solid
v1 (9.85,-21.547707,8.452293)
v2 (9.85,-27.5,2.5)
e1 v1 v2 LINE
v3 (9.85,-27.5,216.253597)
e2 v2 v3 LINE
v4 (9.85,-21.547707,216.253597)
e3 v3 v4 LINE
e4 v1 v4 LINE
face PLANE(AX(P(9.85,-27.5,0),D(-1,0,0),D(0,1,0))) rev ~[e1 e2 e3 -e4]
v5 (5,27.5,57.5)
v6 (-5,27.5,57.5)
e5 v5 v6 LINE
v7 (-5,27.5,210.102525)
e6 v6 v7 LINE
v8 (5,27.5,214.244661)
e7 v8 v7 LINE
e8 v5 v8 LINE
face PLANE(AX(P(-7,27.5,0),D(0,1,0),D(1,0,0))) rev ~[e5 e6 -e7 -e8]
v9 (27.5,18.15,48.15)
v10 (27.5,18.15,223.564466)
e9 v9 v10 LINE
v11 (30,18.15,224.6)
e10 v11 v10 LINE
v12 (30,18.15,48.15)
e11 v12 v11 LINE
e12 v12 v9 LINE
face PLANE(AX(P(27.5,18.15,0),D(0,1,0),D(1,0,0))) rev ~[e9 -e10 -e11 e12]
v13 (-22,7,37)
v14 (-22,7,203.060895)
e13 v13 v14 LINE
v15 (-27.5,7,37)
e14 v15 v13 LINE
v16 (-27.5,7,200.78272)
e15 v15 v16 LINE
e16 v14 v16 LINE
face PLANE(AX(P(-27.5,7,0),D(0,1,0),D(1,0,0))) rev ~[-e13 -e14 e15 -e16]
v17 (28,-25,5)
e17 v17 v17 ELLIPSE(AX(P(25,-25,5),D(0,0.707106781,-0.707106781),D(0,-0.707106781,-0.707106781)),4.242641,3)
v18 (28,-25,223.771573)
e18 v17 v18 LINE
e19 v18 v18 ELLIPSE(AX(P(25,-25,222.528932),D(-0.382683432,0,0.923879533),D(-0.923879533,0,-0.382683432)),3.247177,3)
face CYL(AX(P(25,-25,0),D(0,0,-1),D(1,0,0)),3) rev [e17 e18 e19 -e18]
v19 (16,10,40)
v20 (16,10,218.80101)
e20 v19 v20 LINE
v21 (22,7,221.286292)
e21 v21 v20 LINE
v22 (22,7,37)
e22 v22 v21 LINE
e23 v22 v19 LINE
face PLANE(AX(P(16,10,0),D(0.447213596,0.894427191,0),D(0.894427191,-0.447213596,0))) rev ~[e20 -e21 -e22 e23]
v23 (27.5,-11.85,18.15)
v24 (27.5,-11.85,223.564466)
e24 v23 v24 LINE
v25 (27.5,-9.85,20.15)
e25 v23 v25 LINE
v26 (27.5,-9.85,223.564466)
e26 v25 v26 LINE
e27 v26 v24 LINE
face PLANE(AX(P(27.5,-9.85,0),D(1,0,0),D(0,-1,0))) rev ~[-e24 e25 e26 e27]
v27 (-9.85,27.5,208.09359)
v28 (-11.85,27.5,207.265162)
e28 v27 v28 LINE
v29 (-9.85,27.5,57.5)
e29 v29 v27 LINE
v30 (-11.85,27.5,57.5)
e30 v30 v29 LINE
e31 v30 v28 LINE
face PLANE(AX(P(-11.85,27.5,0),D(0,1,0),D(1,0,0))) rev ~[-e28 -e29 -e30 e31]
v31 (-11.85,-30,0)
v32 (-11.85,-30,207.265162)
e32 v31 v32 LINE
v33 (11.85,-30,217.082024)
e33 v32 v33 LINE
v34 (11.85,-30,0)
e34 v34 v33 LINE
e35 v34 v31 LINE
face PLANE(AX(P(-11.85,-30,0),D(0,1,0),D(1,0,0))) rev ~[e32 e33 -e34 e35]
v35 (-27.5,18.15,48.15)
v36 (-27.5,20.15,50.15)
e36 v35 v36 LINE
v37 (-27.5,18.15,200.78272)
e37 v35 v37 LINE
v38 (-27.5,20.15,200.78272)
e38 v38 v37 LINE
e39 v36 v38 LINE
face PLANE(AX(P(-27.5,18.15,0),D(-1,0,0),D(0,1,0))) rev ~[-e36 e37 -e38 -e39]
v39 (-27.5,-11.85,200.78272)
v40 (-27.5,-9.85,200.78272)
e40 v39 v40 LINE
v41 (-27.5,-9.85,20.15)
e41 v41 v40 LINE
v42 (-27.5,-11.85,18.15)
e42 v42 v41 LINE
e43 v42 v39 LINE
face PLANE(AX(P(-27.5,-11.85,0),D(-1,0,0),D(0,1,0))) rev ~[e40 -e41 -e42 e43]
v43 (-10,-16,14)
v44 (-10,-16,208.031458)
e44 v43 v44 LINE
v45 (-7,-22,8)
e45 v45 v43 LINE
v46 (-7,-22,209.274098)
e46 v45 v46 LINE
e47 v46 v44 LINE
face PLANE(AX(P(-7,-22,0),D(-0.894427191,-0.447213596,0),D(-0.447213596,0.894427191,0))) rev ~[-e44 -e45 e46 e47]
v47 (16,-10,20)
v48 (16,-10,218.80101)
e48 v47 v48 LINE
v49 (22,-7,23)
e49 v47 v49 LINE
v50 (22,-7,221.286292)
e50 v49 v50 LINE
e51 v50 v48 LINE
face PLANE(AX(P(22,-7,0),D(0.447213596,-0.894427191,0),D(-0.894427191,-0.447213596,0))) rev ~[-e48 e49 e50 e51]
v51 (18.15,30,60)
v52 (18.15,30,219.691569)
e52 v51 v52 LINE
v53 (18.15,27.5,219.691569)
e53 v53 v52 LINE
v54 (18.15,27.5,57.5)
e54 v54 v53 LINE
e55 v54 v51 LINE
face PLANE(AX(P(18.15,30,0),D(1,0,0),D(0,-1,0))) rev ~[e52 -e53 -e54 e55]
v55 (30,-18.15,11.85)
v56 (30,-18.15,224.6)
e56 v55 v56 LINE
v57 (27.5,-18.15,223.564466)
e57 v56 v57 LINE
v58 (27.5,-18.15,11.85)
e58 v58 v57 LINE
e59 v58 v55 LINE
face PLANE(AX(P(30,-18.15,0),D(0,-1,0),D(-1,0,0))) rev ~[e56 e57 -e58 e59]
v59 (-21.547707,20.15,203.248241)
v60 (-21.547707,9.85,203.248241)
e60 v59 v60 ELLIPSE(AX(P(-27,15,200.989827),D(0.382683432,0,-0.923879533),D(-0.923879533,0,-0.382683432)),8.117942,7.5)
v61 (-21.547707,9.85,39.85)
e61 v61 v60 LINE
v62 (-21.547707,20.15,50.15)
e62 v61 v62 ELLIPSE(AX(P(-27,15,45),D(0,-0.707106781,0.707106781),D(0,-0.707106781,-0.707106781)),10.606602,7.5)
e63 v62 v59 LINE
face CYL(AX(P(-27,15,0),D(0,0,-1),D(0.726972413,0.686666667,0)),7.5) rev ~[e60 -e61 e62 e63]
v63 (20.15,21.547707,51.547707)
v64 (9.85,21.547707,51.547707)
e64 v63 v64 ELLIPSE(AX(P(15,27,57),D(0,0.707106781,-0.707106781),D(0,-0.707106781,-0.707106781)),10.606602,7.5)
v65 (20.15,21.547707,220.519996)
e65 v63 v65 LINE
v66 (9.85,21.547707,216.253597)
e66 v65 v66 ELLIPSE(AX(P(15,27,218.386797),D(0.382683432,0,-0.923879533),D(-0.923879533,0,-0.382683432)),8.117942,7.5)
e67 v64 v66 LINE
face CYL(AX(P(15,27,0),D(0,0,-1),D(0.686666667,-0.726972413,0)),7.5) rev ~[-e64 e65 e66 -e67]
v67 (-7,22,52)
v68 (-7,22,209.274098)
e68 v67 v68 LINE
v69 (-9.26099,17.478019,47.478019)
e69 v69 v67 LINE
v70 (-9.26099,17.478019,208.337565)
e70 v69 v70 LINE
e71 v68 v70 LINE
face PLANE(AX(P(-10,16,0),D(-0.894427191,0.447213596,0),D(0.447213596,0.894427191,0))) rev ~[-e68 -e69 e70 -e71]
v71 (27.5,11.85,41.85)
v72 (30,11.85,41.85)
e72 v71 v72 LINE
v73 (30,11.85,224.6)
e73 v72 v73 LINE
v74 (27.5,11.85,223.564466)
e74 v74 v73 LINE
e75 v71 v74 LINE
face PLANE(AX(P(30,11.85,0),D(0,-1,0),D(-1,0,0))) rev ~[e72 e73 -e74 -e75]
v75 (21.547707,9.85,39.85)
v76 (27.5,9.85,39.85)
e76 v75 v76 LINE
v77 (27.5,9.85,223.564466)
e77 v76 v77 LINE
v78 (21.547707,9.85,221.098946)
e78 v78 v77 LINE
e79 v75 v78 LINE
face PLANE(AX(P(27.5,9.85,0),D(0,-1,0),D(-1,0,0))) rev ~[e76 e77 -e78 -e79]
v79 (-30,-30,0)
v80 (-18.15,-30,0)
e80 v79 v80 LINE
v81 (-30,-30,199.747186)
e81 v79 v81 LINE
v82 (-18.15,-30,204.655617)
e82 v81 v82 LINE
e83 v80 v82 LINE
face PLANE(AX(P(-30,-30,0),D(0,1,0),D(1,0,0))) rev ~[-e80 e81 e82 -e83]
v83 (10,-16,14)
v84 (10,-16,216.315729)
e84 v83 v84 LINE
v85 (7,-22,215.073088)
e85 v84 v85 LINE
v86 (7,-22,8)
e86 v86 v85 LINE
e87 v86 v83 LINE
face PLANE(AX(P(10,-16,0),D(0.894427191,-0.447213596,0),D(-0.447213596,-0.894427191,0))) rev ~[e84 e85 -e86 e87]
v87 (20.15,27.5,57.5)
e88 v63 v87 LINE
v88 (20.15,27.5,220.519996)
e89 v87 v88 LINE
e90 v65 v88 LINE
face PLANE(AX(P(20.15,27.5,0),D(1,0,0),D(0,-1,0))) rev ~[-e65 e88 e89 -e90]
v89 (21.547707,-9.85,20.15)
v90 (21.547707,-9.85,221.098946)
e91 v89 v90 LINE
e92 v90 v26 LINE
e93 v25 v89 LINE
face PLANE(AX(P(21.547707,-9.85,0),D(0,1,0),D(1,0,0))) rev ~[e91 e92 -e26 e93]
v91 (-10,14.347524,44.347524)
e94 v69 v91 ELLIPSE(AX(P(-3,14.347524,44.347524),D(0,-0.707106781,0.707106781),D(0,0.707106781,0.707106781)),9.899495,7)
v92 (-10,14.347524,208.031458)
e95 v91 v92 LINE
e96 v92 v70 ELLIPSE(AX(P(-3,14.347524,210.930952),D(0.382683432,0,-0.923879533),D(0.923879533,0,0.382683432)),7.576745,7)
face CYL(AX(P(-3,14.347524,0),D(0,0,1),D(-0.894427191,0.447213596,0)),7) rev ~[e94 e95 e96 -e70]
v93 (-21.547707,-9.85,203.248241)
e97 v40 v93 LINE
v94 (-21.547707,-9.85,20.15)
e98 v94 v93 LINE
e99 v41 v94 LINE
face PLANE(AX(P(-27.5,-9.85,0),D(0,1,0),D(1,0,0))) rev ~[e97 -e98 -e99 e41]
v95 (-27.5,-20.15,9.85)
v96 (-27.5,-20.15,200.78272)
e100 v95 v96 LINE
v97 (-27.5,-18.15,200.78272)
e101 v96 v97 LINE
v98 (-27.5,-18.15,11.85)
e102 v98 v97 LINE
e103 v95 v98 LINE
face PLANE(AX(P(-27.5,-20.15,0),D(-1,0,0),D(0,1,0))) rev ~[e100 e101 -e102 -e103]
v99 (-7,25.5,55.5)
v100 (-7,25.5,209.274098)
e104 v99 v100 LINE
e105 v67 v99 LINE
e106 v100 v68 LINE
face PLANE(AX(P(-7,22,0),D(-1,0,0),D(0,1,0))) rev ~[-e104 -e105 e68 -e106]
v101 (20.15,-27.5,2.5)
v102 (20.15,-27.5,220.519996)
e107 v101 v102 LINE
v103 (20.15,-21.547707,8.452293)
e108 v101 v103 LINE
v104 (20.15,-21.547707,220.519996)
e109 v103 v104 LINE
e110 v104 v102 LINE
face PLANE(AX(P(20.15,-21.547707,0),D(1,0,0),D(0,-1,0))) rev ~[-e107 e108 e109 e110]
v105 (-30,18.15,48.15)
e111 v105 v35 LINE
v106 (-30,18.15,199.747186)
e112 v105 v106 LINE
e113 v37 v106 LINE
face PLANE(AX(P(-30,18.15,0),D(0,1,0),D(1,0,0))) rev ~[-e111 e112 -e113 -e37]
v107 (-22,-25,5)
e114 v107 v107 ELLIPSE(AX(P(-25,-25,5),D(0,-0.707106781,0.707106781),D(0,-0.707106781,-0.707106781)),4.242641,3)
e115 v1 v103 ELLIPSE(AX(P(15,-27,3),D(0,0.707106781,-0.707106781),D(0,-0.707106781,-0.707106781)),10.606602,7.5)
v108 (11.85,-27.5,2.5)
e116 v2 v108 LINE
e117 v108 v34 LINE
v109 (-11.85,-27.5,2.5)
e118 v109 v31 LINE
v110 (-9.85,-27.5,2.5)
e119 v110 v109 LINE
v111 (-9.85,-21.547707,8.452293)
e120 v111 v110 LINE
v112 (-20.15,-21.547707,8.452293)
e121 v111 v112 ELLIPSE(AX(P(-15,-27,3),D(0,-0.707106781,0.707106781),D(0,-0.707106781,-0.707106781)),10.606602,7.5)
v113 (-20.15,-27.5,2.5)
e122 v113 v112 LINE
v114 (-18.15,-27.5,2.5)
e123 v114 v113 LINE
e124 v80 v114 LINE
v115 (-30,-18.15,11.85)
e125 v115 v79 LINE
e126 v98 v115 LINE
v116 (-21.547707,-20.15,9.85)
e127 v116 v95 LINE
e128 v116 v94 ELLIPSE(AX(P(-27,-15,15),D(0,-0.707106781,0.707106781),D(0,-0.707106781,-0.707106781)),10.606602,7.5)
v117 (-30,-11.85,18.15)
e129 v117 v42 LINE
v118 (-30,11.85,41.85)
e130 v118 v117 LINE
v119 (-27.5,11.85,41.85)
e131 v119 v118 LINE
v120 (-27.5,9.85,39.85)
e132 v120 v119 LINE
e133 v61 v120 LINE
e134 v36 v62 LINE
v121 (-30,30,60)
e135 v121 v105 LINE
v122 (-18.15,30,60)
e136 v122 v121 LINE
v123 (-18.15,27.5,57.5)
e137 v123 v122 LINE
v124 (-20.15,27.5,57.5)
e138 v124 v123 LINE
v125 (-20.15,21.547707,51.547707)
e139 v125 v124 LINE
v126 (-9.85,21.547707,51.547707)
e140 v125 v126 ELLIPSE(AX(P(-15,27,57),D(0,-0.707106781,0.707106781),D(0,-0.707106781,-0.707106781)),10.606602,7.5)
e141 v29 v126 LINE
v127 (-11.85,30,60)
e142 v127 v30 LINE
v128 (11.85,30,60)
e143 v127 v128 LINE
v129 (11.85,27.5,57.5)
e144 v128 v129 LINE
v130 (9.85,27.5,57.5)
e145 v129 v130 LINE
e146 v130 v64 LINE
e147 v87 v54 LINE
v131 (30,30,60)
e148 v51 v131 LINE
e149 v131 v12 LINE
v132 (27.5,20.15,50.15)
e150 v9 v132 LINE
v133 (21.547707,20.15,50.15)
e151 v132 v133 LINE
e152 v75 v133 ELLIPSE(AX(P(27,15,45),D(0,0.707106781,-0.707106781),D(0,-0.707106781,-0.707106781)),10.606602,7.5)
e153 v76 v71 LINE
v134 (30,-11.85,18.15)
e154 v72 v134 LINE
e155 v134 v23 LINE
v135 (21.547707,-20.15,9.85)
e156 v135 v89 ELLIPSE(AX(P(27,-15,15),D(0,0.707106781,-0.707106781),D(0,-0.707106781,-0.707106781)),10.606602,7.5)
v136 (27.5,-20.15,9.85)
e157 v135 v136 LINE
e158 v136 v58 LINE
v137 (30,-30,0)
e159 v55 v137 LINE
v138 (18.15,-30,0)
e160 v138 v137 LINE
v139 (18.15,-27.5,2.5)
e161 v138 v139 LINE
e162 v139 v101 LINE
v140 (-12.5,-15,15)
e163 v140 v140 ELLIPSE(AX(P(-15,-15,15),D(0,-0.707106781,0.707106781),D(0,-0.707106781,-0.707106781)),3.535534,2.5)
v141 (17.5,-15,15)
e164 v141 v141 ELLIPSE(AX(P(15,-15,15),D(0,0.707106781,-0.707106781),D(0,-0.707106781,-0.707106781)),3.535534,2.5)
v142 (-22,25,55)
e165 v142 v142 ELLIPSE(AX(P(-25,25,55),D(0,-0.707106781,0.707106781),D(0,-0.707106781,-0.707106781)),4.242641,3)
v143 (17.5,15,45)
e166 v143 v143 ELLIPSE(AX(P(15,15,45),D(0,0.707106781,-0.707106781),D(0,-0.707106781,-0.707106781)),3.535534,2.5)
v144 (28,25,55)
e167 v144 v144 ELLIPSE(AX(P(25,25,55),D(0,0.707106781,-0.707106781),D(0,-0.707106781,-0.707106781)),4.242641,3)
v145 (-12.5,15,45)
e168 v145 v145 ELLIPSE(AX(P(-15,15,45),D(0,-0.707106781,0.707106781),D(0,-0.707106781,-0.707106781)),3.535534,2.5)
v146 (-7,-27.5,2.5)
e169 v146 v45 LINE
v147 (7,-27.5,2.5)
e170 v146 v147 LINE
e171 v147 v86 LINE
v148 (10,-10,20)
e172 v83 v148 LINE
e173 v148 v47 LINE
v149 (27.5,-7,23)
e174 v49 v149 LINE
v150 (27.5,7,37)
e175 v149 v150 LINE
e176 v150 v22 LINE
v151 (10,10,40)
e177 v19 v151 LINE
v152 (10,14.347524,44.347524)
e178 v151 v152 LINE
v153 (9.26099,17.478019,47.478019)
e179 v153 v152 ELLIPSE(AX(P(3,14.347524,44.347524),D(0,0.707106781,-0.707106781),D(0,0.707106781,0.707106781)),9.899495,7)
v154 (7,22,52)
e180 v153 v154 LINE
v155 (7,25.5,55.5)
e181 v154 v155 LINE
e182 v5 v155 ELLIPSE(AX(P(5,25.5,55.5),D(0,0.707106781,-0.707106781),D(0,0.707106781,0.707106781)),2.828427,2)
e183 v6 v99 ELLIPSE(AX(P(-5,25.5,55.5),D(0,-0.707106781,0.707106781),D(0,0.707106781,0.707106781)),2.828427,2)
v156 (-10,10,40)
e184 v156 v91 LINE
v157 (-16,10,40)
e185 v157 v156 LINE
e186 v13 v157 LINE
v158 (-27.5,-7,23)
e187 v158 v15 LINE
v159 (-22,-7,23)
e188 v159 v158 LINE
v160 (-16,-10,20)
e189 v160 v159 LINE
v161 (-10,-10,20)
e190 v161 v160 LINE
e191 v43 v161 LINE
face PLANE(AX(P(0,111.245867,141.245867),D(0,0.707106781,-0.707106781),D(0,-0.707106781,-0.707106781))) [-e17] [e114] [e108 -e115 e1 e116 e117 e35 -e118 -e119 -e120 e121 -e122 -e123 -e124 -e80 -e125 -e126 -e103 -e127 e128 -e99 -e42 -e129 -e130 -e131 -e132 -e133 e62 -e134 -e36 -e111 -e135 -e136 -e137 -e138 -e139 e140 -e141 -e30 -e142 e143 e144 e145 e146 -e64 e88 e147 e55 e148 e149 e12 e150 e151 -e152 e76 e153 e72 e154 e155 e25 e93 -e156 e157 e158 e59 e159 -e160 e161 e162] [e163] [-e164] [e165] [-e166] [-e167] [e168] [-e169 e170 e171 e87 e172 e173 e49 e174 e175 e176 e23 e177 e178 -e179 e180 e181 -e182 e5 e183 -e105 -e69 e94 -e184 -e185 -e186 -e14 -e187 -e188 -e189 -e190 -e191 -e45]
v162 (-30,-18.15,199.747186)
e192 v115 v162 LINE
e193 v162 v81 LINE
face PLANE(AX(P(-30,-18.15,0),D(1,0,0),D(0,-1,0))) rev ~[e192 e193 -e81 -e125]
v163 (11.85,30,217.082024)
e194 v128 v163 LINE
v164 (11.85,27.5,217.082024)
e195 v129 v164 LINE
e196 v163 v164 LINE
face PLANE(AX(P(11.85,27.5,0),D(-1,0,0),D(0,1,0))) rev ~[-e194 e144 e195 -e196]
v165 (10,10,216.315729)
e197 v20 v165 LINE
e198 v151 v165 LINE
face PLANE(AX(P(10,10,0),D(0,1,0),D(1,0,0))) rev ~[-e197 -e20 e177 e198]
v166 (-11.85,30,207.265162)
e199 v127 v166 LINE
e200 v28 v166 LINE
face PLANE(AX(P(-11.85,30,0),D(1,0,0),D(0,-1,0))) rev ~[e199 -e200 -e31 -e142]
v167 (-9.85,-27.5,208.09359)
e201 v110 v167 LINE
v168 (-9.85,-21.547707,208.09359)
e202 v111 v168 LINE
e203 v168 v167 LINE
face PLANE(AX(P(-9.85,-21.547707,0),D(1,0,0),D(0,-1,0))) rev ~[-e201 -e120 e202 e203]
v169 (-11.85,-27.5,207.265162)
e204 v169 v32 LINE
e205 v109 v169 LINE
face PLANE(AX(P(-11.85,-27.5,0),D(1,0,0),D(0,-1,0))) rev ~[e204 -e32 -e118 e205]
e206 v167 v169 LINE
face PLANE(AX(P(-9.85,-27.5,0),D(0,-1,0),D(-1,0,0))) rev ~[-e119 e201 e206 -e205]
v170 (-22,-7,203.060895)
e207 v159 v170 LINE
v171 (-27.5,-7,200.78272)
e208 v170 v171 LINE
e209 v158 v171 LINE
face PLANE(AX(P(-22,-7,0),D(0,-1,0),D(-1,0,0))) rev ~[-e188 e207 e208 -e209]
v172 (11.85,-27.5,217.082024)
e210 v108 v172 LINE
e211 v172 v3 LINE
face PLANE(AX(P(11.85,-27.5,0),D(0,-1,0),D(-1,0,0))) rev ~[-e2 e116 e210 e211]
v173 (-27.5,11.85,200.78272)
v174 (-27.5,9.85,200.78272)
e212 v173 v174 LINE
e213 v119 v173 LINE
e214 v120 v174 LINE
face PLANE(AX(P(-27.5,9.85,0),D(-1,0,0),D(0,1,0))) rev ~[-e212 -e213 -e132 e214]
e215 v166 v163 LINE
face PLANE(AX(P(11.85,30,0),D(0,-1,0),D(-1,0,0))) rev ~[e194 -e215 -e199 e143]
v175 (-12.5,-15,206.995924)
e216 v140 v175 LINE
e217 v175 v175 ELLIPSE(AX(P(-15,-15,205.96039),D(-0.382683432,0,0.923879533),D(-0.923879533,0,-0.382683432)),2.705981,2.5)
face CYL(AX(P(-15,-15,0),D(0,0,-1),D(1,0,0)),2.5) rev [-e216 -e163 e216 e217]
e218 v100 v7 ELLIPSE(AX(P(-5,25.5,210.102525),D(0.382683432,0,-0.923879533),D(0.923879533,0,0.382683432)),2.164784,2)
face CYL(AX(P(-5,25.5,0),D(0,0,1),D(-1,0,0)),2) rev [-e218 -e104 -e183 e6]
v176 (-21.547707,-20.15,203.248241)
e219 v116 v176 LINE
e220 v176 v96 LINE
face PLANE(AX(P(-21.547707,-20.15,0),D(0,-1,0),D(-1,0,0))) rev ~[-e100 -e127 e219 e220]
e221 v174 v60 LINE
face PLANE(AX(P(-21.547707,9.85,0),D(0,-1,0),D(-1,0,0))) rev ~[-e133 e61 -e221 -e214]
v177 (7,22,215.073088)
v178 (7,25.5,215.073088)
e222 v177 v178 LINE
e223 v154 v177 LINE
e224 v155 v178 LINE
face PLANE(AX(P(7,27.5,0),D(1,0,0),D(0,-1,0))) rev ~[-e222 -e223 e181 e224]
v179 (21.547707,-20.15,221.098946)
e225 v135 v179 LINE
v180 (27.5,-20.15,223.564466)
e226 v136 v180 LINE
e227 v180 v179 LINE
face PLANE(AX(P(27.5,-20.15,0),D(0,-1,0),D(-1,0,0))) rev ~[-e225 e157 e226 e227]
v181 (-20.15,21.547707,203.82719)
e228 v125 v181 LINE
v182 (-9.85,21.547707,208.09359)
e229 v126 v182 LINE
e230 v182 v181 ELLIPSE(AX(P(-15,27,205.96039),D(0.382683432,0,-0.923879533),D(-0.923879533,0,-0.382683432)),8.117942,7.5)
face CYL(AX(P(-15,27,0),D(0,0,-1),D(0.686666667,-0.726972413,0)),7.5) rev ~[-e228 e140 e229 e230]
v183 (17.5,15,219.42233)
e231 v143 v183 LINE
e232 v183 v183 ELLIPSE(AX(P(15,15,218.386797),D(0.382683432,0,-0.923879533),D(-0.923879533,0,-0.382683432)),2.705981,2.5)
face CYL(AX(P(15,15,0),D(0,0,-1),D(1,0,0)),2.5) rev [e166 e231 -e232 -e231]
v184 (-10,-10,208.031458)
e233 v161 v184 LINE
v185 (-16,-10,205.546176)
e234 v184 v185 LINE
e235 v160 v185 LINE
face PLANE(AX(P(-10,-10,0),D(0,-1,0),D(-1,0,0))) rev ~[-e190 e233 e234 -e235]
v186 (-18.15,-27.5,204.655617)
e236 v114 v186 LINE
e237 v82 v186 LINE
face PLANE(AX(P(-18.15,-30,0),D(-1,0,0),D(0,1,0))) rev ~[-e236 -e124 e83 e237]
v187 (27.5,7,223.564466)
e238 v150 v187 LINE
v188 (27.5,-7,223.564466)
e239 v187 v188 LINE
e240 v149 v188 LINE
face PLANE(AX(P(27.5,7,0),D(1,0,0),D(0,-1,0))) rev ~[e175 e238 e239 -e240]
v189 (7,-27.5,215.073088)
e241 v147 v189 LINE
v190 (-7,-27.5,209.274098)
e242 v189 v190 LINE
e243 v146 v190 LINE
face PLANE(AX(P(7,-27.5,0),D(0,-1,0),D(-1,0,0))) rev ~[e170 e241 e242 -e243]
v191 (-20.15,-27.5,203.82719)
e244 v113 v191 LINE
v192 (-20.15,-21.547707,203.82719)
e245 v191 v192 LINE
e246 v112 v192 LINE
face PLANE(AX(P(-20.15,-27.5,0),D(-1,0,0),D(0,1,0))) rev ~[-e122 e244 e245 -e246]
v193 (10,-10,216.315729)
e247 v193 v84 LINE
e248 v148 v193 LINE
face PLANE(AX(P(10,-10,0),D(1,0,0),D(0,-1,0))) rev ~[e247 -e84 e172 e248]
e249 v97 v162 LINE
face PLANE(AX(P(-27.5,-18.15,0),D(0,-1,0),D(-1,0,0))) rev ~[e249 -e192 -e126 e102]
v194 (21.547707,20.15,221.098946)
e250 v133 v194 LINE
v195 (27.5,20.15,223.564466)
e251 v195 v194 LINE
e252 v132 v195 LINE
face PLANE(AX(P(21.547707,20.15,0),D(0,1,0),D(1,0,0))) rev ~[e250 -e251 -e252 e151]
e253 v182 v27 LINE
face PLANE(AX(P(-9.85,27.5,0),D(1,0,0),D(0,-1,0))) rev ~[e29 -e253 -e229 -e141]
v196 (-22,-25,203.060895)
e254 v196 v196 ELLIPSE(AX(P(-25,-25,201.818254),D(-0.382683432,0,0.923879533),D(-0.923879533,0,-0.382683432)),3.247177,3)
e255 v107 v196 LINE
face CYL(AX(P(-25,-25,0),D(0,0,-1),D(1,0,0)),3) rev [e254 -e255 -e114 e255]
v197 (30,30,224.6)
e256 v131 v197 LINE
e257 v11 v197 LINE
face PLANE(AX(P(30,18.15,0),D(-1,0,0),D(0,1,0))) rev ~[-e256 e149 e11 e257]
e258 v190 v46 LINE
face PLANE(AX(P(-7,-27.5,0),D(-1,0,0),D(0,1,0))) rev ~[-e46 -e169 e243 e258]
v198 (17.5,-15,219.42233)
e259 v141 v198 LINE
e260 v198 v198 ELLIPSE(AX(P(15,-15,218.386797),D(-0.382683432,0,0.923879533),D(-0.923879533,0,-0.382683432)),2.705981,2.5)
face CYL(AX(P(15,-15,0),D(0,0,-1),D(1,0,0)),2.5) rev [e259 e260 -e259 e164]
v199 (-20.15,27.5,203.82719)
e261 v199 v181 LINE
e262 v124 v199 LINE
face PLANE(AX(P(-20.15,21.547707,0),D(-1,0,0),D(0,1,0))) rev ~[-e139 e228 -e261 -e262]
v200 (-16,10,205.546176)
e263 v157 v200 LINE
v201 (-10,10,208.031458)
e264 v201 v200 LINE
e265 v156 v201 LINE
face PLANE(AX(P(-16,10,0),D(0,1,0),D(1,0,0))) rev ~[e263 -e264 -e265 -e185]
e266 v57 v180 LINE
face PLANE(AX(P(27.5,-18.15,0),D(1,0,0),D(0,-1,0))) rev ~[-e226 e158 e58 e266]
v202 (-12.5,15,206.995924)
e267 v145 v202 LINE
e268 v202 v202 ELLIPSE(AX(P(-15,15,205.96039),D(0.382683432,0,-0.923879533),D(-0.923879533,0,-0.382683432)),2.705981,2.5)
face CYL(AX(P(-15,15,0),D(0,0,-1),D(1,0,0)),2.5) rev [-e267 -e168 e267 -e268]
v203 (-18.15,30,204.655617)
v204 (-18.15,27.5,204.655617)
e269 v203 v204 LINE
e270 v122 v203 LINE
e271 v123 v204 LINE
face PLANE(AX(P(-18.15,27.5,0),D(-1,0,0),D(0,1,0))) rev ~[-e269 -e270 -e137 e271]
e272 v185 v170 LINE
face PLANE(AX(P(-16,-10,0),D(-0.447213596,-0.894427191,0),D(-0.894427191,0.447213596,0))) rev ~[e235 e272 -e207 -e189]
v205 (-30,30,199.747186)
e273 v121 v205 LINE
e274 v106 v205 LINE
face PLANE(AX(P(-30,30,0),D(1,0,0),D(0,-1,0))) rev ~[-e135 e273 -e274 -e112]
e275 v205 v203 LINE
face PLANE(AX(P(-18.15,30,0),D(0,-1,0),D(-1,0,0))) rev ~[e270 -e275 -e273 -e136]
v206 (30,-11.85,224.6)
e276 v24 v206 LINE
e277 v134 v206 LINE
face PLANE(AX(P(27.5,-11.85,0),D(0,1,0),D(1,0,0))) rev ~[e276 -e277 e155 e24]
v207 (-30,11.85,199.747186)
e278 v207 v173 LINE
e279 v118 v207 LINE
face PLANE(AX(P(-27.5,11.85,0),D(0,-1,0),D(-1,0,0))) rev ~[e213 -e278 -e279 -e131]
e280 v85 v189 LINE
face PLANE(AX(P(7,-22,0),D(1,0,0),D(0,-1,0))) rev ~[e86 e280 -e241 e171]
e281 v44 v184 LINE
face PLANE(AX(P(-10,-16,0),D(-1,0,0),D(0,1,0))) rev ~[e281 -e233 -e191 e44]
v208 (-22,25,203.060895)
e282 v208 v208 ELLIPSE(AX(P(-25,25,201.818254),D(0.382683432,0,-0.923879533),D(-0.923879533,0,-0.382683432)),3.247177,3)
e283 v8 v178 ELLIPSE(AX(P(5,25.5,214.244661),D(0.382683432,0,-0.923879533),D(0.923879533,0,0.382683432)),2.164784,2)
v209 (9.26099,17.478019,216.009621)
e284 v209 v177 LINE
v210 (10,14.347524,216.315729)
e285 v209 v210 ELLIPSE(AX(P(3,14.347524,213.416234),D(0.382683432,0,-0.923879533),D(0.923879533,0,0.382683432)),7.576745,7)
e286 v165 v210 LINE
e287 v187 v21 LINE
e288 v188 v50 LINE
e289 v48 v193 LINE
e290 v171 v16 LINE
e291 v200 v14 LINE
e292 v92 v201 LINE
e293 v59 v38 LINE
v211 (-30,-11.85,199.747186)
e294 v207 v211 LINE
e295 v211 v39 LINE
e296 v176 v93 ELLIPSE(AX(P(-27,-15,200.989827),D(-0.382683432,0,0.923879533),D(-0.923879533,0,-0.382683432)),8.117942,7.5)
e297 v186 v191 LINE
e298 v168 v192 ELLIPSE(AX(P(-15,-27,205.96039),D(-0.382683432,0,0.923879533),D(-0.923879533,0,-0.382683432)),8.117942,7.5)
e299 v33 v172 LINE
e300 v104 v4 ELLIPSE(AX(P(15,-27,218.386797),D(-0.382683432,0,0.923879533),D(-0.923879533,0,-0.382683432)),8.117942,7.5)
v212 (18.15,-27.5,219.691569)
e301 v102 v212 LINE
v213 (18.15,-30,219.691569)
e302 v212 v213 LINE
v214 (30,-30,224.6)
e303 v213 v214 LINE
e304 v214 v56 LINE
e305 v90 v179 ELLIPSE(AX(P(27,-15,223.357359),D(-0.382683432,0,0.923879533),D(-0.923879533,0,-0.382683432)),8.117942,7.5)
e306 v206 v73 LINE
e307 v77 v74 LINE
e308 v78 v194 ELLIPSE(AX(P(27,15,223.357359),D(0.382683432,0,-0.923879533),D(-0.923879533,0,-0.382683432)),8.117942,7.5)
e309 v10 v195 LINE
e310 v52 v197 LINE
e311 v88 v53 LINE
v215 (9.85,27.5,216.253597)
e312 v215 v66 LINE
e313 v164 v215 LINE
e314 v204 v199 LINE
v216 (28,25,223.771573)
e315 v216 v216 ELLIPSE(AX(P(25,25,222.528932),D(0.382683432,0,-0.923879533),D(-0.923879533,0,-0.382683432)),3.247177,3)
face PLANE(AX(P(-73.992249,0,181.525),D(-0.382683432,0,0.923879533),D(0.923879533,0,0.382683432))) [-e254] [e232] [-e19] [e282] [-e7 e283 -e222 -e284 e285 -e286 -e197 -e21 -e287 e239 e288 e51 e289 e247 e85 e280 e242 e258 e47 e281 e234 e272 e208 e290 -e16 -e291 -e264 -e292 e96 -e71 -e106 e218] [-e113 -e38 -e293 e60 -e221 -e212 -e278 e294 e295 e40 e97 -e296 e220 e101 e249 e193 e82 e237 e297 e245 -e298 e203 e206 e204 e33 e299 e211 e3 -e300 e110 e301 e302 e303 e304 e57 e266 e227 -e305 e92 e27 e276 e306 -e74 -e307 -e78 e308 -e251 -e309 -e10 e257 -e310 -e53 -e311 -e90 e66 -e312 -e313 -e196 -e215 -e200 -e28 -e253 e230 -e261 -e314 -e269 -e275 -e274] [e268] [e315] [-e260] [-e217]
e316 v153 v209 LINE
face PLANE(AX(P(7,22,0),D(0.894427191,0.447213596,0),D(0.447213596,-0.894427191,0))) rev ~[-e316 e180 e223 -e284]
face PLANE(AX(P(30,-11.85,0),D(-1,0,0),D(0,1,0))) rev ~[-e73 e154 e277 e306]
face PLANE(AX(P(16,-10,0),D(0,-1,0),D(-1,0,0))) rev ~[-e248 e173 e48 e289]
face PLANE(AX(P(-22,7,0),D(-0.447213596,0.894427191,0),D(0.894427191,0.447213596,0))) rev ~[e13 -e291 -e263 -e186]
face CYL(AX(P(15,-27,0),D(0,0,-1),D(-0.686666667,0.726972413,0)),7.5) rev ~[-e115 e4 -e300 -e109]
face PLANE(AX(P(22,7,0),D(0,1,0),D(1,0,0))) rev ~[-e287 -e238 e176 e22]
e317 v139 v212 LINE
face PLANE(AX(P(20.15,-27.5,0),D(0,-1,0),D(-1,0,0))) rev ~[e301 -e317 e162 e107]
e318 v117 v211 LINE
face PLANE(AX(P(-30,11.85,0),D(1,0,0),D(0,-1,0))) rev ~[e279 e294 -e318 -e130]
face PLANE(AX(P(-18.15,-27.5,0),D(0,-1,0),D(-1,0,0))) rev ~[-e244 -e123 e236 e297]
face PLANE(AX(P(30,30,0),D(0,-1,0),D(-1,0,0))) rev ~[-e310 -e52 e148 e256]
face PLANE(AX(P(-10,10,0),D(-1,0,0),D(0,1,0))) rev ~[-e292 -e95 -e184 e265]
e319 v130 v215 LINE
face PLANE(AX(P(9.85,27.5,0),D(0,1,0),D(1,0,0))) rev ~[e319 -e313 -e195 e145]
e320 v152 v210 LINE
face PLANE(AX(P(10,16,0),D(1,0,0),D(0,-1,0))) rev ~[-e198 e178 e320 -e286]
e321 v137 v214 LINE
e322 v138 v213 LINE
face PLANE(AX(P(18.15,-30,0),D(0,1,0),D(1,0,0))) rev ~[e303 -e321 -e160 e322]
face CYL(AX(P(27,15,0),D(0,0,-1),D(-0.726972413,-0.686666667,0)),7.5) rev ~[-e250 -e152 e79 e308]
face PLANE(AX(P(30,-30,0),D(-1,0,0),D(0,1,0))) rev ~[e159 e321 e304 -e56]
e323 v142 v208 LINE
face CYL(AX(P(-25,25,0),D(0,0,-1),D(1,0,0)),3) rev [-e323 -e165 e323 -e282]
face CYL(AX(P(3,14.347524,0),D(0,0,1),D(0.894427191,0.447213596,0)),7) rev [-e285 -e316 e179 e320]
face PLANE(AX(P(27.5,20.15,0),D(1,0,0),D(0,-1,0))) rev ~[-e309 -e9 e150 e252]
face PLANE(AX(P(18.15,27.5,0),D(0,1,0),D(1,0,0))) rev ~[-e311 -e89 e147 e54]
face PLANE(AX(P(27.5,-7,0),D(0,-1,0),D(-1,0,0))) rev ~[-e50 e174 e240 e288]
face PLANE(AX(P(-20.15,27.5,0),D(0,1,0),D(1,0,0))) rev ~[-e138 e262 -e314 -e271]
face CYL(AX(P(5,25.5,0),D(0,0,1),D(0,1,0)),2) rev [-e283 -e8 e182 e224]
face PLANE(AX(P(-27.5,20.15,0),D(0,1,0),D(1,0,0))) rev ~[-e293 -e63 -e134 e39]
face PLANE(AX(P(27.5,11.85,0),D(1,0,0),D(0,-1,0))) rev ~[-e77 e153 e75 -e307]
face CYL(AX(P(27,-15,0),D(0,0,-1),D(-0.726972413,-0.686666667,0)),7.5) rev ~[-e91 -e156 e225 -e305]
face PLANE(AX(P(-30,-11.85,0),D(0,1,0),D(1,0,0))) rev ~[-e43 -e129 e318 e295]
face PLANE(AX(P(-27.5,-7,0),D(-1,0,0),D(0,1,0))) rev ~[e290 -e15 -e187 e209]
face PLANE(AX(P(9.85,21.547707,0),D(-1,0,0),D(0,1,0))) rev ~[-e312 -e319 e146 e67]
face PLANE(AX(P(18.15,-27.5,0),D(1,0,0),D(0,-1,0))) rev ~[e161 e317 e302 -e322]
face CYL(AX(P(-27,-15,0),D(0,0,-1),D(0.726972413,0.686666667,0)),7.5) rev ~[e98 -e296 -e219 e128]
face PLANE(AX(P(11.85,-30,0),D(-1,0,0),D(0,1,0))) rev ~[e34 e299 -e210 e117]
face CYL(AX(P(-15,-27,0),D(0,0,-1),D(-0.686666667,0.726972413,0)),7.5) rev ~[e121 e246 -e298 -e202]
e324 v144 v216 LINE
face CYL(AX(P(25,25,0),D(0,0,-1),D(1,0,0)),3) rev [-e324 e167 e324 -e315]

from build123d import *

# Parameters (mm, degrees)
F0_R          = 3
F0_R_2        = 2.5
F1_DEPTH      = 224.6
F2_R          = 2
F3_R          = 7
F6_DEPTH      = 30
F6_DEPTH_BACK = 30
F8_DEPTH      = 30
F8_DEPTH_BACK = 30


# Not quite as in the source:
# - a feature names something its author has since deleted; it is built from what else it names


with BuildPart() as f1:
    # F0 (on Top) → F1 (new body)
    with BuildSketch(Plane.XY):
        with BuildLine():
            Line((18.15, -30), (30, -30))
            Line((30, -30), (30, -18.15))
            Line((30, -18.15), (27.5, -18.15))
            Line((27.5, -18.15), (27.5, -20.15))
            Line((27.5, -20.15), (21.5477069044, -20.15))
            ThreePointArc((21.5477069044, -20.15), (19.5, -15), (21.5477069044, -9.85))
            Line((21.5477069044, -9.85), (27.5, -9.85))
            Line((27.5, -9.85), (27.5, -11.85))
            Line((27.5, -11.85), (30, -11.85))
            Line((30, -11.85), (30, 11.85))
            Line((30, 11.85), (27.5, 11.85))
            Line((27.5, 11.85), (27.5, 9.85))
            Line((27.5, 9.85), (21.5477069044, 9.85))
            ThreePointArc((21.5477069044, 9.85), (19.5, 15), (21.5477069044, 20.15))
            Line((21.5477069044, 20.15), (27.5, 20.15))
            Line((27.5, 20.15), (27.5, 18.15))
            Line((27.5, 18.15), (30, 18.15))
            Line((30, 18.15), (30, 30))
            Line((30, 30), (18.15, 30))
            Line((18.15, 30), (18.15, 27.5))
            Line((18.15, 27.5), (20.15, 27.5))
            Line((20.15, 27.5), (20.15, 21.5477069044))
            ThreePointArc((20.15, 21.5477069044), (15, 19.5), (9.85, 21.5477069044))
            Line((9.85, 21.5477069044), (9.85, 27.5))
            Line((9.85, 27.5), (11.85, 27.5))
            Line((11.85, 27.5), (11.85, 30))
            Line((11.85, 30), (-11.85, 30))
            Line((-11.85, 30), (-11.85, 27.5))
            Line((-11.85, 27.5), (-9.85, 27.5))
            Line((-9.85, 27.5), (-9.85, 21.5477069044))
            ThreePointArc((-9.85, 21.5477069044), (-15, 19.5), (-20.15, 21.5477069044))
            Line((-20.15, 21.5477069044), (-20.15, 27.5))
            Line((-20.15, 27.5), (-18.15, 27.5))
            Line((-18.15, 27.5), (-18.15, 30))
            Line((-18.15, 30), (-30, 30))
            Line((-30, 30), (-30, 18.15))
            Line((-30, 18.15), (-27.5, 18.15))
            Line((-27.5, 18.15), (-27.5, 20.15))
            Line((-27.5, 20.15), (-21.5477069044, 20.15))
            ThreePointArc((-21.5477069044, 20.15), (-19.5, 15), (-21.5477069044, 9.85))
            Line((-21.5477069044, 9.85), (-27.5, 9.85))
            Line((-27.5, 9.85), (-27.5, 11.85))
            Line((-27.5, 11.85), (-30, 11.85))
            Line((-30, 11.85), (-30, -11.85))
            Line((-30, -11.85), (-27.5, -11.85))
            Line((-27.5, -11.85), (-27.5, -9.85))
            Line((-27.5, -9.85), (-21.5477069044, -9.85))
            ThreePointArc((-21.5477069044, -9.85), (-19.5, -15), (-21.5477069044, -20.15))
            Line((-21.5477069044, -20.15), (-27.5, -20.15))
            Line((-27.5, -20.15), (-27.5, -18.15))
            Line((-27.5, -18.15), (-30, -18.15))
            Line((-30, -18.15), (-30, -30))
            Line((-30, -30), (-18.15, -30))
            Line((-18.15, -30), (-18.15, -27.5))
            Line((-18.15, -27.5), (-20.15, -27.5))
            Line((-20.15, -27.5), (-20.15, -21.5477069044))
            ThreePointArc((-20.15, -21.5477069044), (-15, -19.5), (-9.85, -21.5477069044))
            Line((-9.85, -21.5477069044), (-9.85, -27.5))
            Line((-9.85, -27.5), (-11.85, -27.5))
            Line((-11.85, -27.5), (-11.85, -30))
            Line((-11.85, -30), (11.85, -30))
            Line((11.85, -30), (11.85, -27.5))
            Line((11.85, -27.5), (9.85, -27.5))
            Line((9.85, -27.5), (9.85, -21.5477069044))
            ThreePointArc((9.85, -21.5477069044), (15, -19.5), (20.15, -21.5477069044))
            Line((20.15, -21.5477069044), (20.15, -27.5))
            Line((20.15, -27.5), (18.15, -27.5))
            Line((18.15, -27.5), (18.15, -30))
        make_face()
        with Locations((-25, -25)):
            Circle(F0_R, mode=Mode.SUBTRACT)
        with Locations((-15, -15)):
            Circle(F0_R_2, mode=Mode.SUBTRACT)
        with Locations((25, -25)):
            Circle(F0_R, mode=Mode.SUBTRACT)
        with Locations((15, -15)):
            Circle(F0_R_2, mode=Mode.SUBTRACT)
        with Locations((-25, 25)):
            Circle(F0_R, mode=Mode.SUBTRACT)
        with Locations((-15, 15)):
            Circle(F0_R_2, mode=Mode.SUBTRACT)
        Polygon((-7, 22), (-7, 27.5), (0, 27.5), (7, 27.5), (7, 22), (10, 16), (10, 10), (16, 10), (22, 7), (27.5, 7), (27.5, 0), (27.5, -7), (22, -7), (16, -10), (10, -10), (10, -16), (7, -22), (7, -27.5), (0, -27.5), (-7, -27.5), (-7, -22), (-10, -16), (-10, -10), (-16, -10), (-22, -7), (-27.5, -7), (-27.5, 0), (-27.5, 7), (-22, 7), (-16, 10), (-10, 10), (-10, 16), align=None, mode=Mode.SUBTRACT)
        with Locations((15, 15)):
            Circle(F0_R_2, mode=Mode.SUBTRACT)
        with Locations((25, 25)):
            Circle(F0_R, mode=Mode.SUBTRACT)
    extrude(amount=F1_DEPTH)

    # F2
    f2_edges = [f1.edges().sort_by_distance(p)[0] for p in [
        (-7, 27.5, 112.3),
        (7, 27.5, 112.3),
    ]]
    fillet(f2_edges, radius=F2_R)

    # F3
    f3_edges = [f1.edges().sort_by_distance(p)[0] for p in [
        (-10, 16, 112.3),
        (10, 16, 112.3),
    ]]
    fillet(f3_edges, radius=F3_R)

    # F5 (on Right) → F6 (cut, two sides)
    with BuildSketch(Plane.YZ) as f6_sk:
        Polygon((70.3932136338, -100.3932136338), (211.6390804038, 40.8526531362), (111.24586677, 141.24586677), (-30, 0), align=None)
    extrude(amount=-F6_DEPTH, mode=Mode.SUBTRACT)
    extrude(f6_sk.sketch, amount=F6_DEPTH_BACK, mode=Mode.SUBTRACT)

    # F7 (on Front) → F8 (cut, two sides)
    with BuildSketch(Plane.XZ) as f8_sk:
        Polygon((-32.0951359741, 374.5109194261), (-136.0873846676, 331.4359196356), (-73.9922486935, 181.5250002095), (30, 224.6), align=None)
    extrude(amount=F8_DEPTH, mode=Mode.SUBTRACT)
    extrude(f8_sk.sketch, amount=-F8_DEPTH_BACK, mode=Mode.SUBTRACT)


solid = f1.part
